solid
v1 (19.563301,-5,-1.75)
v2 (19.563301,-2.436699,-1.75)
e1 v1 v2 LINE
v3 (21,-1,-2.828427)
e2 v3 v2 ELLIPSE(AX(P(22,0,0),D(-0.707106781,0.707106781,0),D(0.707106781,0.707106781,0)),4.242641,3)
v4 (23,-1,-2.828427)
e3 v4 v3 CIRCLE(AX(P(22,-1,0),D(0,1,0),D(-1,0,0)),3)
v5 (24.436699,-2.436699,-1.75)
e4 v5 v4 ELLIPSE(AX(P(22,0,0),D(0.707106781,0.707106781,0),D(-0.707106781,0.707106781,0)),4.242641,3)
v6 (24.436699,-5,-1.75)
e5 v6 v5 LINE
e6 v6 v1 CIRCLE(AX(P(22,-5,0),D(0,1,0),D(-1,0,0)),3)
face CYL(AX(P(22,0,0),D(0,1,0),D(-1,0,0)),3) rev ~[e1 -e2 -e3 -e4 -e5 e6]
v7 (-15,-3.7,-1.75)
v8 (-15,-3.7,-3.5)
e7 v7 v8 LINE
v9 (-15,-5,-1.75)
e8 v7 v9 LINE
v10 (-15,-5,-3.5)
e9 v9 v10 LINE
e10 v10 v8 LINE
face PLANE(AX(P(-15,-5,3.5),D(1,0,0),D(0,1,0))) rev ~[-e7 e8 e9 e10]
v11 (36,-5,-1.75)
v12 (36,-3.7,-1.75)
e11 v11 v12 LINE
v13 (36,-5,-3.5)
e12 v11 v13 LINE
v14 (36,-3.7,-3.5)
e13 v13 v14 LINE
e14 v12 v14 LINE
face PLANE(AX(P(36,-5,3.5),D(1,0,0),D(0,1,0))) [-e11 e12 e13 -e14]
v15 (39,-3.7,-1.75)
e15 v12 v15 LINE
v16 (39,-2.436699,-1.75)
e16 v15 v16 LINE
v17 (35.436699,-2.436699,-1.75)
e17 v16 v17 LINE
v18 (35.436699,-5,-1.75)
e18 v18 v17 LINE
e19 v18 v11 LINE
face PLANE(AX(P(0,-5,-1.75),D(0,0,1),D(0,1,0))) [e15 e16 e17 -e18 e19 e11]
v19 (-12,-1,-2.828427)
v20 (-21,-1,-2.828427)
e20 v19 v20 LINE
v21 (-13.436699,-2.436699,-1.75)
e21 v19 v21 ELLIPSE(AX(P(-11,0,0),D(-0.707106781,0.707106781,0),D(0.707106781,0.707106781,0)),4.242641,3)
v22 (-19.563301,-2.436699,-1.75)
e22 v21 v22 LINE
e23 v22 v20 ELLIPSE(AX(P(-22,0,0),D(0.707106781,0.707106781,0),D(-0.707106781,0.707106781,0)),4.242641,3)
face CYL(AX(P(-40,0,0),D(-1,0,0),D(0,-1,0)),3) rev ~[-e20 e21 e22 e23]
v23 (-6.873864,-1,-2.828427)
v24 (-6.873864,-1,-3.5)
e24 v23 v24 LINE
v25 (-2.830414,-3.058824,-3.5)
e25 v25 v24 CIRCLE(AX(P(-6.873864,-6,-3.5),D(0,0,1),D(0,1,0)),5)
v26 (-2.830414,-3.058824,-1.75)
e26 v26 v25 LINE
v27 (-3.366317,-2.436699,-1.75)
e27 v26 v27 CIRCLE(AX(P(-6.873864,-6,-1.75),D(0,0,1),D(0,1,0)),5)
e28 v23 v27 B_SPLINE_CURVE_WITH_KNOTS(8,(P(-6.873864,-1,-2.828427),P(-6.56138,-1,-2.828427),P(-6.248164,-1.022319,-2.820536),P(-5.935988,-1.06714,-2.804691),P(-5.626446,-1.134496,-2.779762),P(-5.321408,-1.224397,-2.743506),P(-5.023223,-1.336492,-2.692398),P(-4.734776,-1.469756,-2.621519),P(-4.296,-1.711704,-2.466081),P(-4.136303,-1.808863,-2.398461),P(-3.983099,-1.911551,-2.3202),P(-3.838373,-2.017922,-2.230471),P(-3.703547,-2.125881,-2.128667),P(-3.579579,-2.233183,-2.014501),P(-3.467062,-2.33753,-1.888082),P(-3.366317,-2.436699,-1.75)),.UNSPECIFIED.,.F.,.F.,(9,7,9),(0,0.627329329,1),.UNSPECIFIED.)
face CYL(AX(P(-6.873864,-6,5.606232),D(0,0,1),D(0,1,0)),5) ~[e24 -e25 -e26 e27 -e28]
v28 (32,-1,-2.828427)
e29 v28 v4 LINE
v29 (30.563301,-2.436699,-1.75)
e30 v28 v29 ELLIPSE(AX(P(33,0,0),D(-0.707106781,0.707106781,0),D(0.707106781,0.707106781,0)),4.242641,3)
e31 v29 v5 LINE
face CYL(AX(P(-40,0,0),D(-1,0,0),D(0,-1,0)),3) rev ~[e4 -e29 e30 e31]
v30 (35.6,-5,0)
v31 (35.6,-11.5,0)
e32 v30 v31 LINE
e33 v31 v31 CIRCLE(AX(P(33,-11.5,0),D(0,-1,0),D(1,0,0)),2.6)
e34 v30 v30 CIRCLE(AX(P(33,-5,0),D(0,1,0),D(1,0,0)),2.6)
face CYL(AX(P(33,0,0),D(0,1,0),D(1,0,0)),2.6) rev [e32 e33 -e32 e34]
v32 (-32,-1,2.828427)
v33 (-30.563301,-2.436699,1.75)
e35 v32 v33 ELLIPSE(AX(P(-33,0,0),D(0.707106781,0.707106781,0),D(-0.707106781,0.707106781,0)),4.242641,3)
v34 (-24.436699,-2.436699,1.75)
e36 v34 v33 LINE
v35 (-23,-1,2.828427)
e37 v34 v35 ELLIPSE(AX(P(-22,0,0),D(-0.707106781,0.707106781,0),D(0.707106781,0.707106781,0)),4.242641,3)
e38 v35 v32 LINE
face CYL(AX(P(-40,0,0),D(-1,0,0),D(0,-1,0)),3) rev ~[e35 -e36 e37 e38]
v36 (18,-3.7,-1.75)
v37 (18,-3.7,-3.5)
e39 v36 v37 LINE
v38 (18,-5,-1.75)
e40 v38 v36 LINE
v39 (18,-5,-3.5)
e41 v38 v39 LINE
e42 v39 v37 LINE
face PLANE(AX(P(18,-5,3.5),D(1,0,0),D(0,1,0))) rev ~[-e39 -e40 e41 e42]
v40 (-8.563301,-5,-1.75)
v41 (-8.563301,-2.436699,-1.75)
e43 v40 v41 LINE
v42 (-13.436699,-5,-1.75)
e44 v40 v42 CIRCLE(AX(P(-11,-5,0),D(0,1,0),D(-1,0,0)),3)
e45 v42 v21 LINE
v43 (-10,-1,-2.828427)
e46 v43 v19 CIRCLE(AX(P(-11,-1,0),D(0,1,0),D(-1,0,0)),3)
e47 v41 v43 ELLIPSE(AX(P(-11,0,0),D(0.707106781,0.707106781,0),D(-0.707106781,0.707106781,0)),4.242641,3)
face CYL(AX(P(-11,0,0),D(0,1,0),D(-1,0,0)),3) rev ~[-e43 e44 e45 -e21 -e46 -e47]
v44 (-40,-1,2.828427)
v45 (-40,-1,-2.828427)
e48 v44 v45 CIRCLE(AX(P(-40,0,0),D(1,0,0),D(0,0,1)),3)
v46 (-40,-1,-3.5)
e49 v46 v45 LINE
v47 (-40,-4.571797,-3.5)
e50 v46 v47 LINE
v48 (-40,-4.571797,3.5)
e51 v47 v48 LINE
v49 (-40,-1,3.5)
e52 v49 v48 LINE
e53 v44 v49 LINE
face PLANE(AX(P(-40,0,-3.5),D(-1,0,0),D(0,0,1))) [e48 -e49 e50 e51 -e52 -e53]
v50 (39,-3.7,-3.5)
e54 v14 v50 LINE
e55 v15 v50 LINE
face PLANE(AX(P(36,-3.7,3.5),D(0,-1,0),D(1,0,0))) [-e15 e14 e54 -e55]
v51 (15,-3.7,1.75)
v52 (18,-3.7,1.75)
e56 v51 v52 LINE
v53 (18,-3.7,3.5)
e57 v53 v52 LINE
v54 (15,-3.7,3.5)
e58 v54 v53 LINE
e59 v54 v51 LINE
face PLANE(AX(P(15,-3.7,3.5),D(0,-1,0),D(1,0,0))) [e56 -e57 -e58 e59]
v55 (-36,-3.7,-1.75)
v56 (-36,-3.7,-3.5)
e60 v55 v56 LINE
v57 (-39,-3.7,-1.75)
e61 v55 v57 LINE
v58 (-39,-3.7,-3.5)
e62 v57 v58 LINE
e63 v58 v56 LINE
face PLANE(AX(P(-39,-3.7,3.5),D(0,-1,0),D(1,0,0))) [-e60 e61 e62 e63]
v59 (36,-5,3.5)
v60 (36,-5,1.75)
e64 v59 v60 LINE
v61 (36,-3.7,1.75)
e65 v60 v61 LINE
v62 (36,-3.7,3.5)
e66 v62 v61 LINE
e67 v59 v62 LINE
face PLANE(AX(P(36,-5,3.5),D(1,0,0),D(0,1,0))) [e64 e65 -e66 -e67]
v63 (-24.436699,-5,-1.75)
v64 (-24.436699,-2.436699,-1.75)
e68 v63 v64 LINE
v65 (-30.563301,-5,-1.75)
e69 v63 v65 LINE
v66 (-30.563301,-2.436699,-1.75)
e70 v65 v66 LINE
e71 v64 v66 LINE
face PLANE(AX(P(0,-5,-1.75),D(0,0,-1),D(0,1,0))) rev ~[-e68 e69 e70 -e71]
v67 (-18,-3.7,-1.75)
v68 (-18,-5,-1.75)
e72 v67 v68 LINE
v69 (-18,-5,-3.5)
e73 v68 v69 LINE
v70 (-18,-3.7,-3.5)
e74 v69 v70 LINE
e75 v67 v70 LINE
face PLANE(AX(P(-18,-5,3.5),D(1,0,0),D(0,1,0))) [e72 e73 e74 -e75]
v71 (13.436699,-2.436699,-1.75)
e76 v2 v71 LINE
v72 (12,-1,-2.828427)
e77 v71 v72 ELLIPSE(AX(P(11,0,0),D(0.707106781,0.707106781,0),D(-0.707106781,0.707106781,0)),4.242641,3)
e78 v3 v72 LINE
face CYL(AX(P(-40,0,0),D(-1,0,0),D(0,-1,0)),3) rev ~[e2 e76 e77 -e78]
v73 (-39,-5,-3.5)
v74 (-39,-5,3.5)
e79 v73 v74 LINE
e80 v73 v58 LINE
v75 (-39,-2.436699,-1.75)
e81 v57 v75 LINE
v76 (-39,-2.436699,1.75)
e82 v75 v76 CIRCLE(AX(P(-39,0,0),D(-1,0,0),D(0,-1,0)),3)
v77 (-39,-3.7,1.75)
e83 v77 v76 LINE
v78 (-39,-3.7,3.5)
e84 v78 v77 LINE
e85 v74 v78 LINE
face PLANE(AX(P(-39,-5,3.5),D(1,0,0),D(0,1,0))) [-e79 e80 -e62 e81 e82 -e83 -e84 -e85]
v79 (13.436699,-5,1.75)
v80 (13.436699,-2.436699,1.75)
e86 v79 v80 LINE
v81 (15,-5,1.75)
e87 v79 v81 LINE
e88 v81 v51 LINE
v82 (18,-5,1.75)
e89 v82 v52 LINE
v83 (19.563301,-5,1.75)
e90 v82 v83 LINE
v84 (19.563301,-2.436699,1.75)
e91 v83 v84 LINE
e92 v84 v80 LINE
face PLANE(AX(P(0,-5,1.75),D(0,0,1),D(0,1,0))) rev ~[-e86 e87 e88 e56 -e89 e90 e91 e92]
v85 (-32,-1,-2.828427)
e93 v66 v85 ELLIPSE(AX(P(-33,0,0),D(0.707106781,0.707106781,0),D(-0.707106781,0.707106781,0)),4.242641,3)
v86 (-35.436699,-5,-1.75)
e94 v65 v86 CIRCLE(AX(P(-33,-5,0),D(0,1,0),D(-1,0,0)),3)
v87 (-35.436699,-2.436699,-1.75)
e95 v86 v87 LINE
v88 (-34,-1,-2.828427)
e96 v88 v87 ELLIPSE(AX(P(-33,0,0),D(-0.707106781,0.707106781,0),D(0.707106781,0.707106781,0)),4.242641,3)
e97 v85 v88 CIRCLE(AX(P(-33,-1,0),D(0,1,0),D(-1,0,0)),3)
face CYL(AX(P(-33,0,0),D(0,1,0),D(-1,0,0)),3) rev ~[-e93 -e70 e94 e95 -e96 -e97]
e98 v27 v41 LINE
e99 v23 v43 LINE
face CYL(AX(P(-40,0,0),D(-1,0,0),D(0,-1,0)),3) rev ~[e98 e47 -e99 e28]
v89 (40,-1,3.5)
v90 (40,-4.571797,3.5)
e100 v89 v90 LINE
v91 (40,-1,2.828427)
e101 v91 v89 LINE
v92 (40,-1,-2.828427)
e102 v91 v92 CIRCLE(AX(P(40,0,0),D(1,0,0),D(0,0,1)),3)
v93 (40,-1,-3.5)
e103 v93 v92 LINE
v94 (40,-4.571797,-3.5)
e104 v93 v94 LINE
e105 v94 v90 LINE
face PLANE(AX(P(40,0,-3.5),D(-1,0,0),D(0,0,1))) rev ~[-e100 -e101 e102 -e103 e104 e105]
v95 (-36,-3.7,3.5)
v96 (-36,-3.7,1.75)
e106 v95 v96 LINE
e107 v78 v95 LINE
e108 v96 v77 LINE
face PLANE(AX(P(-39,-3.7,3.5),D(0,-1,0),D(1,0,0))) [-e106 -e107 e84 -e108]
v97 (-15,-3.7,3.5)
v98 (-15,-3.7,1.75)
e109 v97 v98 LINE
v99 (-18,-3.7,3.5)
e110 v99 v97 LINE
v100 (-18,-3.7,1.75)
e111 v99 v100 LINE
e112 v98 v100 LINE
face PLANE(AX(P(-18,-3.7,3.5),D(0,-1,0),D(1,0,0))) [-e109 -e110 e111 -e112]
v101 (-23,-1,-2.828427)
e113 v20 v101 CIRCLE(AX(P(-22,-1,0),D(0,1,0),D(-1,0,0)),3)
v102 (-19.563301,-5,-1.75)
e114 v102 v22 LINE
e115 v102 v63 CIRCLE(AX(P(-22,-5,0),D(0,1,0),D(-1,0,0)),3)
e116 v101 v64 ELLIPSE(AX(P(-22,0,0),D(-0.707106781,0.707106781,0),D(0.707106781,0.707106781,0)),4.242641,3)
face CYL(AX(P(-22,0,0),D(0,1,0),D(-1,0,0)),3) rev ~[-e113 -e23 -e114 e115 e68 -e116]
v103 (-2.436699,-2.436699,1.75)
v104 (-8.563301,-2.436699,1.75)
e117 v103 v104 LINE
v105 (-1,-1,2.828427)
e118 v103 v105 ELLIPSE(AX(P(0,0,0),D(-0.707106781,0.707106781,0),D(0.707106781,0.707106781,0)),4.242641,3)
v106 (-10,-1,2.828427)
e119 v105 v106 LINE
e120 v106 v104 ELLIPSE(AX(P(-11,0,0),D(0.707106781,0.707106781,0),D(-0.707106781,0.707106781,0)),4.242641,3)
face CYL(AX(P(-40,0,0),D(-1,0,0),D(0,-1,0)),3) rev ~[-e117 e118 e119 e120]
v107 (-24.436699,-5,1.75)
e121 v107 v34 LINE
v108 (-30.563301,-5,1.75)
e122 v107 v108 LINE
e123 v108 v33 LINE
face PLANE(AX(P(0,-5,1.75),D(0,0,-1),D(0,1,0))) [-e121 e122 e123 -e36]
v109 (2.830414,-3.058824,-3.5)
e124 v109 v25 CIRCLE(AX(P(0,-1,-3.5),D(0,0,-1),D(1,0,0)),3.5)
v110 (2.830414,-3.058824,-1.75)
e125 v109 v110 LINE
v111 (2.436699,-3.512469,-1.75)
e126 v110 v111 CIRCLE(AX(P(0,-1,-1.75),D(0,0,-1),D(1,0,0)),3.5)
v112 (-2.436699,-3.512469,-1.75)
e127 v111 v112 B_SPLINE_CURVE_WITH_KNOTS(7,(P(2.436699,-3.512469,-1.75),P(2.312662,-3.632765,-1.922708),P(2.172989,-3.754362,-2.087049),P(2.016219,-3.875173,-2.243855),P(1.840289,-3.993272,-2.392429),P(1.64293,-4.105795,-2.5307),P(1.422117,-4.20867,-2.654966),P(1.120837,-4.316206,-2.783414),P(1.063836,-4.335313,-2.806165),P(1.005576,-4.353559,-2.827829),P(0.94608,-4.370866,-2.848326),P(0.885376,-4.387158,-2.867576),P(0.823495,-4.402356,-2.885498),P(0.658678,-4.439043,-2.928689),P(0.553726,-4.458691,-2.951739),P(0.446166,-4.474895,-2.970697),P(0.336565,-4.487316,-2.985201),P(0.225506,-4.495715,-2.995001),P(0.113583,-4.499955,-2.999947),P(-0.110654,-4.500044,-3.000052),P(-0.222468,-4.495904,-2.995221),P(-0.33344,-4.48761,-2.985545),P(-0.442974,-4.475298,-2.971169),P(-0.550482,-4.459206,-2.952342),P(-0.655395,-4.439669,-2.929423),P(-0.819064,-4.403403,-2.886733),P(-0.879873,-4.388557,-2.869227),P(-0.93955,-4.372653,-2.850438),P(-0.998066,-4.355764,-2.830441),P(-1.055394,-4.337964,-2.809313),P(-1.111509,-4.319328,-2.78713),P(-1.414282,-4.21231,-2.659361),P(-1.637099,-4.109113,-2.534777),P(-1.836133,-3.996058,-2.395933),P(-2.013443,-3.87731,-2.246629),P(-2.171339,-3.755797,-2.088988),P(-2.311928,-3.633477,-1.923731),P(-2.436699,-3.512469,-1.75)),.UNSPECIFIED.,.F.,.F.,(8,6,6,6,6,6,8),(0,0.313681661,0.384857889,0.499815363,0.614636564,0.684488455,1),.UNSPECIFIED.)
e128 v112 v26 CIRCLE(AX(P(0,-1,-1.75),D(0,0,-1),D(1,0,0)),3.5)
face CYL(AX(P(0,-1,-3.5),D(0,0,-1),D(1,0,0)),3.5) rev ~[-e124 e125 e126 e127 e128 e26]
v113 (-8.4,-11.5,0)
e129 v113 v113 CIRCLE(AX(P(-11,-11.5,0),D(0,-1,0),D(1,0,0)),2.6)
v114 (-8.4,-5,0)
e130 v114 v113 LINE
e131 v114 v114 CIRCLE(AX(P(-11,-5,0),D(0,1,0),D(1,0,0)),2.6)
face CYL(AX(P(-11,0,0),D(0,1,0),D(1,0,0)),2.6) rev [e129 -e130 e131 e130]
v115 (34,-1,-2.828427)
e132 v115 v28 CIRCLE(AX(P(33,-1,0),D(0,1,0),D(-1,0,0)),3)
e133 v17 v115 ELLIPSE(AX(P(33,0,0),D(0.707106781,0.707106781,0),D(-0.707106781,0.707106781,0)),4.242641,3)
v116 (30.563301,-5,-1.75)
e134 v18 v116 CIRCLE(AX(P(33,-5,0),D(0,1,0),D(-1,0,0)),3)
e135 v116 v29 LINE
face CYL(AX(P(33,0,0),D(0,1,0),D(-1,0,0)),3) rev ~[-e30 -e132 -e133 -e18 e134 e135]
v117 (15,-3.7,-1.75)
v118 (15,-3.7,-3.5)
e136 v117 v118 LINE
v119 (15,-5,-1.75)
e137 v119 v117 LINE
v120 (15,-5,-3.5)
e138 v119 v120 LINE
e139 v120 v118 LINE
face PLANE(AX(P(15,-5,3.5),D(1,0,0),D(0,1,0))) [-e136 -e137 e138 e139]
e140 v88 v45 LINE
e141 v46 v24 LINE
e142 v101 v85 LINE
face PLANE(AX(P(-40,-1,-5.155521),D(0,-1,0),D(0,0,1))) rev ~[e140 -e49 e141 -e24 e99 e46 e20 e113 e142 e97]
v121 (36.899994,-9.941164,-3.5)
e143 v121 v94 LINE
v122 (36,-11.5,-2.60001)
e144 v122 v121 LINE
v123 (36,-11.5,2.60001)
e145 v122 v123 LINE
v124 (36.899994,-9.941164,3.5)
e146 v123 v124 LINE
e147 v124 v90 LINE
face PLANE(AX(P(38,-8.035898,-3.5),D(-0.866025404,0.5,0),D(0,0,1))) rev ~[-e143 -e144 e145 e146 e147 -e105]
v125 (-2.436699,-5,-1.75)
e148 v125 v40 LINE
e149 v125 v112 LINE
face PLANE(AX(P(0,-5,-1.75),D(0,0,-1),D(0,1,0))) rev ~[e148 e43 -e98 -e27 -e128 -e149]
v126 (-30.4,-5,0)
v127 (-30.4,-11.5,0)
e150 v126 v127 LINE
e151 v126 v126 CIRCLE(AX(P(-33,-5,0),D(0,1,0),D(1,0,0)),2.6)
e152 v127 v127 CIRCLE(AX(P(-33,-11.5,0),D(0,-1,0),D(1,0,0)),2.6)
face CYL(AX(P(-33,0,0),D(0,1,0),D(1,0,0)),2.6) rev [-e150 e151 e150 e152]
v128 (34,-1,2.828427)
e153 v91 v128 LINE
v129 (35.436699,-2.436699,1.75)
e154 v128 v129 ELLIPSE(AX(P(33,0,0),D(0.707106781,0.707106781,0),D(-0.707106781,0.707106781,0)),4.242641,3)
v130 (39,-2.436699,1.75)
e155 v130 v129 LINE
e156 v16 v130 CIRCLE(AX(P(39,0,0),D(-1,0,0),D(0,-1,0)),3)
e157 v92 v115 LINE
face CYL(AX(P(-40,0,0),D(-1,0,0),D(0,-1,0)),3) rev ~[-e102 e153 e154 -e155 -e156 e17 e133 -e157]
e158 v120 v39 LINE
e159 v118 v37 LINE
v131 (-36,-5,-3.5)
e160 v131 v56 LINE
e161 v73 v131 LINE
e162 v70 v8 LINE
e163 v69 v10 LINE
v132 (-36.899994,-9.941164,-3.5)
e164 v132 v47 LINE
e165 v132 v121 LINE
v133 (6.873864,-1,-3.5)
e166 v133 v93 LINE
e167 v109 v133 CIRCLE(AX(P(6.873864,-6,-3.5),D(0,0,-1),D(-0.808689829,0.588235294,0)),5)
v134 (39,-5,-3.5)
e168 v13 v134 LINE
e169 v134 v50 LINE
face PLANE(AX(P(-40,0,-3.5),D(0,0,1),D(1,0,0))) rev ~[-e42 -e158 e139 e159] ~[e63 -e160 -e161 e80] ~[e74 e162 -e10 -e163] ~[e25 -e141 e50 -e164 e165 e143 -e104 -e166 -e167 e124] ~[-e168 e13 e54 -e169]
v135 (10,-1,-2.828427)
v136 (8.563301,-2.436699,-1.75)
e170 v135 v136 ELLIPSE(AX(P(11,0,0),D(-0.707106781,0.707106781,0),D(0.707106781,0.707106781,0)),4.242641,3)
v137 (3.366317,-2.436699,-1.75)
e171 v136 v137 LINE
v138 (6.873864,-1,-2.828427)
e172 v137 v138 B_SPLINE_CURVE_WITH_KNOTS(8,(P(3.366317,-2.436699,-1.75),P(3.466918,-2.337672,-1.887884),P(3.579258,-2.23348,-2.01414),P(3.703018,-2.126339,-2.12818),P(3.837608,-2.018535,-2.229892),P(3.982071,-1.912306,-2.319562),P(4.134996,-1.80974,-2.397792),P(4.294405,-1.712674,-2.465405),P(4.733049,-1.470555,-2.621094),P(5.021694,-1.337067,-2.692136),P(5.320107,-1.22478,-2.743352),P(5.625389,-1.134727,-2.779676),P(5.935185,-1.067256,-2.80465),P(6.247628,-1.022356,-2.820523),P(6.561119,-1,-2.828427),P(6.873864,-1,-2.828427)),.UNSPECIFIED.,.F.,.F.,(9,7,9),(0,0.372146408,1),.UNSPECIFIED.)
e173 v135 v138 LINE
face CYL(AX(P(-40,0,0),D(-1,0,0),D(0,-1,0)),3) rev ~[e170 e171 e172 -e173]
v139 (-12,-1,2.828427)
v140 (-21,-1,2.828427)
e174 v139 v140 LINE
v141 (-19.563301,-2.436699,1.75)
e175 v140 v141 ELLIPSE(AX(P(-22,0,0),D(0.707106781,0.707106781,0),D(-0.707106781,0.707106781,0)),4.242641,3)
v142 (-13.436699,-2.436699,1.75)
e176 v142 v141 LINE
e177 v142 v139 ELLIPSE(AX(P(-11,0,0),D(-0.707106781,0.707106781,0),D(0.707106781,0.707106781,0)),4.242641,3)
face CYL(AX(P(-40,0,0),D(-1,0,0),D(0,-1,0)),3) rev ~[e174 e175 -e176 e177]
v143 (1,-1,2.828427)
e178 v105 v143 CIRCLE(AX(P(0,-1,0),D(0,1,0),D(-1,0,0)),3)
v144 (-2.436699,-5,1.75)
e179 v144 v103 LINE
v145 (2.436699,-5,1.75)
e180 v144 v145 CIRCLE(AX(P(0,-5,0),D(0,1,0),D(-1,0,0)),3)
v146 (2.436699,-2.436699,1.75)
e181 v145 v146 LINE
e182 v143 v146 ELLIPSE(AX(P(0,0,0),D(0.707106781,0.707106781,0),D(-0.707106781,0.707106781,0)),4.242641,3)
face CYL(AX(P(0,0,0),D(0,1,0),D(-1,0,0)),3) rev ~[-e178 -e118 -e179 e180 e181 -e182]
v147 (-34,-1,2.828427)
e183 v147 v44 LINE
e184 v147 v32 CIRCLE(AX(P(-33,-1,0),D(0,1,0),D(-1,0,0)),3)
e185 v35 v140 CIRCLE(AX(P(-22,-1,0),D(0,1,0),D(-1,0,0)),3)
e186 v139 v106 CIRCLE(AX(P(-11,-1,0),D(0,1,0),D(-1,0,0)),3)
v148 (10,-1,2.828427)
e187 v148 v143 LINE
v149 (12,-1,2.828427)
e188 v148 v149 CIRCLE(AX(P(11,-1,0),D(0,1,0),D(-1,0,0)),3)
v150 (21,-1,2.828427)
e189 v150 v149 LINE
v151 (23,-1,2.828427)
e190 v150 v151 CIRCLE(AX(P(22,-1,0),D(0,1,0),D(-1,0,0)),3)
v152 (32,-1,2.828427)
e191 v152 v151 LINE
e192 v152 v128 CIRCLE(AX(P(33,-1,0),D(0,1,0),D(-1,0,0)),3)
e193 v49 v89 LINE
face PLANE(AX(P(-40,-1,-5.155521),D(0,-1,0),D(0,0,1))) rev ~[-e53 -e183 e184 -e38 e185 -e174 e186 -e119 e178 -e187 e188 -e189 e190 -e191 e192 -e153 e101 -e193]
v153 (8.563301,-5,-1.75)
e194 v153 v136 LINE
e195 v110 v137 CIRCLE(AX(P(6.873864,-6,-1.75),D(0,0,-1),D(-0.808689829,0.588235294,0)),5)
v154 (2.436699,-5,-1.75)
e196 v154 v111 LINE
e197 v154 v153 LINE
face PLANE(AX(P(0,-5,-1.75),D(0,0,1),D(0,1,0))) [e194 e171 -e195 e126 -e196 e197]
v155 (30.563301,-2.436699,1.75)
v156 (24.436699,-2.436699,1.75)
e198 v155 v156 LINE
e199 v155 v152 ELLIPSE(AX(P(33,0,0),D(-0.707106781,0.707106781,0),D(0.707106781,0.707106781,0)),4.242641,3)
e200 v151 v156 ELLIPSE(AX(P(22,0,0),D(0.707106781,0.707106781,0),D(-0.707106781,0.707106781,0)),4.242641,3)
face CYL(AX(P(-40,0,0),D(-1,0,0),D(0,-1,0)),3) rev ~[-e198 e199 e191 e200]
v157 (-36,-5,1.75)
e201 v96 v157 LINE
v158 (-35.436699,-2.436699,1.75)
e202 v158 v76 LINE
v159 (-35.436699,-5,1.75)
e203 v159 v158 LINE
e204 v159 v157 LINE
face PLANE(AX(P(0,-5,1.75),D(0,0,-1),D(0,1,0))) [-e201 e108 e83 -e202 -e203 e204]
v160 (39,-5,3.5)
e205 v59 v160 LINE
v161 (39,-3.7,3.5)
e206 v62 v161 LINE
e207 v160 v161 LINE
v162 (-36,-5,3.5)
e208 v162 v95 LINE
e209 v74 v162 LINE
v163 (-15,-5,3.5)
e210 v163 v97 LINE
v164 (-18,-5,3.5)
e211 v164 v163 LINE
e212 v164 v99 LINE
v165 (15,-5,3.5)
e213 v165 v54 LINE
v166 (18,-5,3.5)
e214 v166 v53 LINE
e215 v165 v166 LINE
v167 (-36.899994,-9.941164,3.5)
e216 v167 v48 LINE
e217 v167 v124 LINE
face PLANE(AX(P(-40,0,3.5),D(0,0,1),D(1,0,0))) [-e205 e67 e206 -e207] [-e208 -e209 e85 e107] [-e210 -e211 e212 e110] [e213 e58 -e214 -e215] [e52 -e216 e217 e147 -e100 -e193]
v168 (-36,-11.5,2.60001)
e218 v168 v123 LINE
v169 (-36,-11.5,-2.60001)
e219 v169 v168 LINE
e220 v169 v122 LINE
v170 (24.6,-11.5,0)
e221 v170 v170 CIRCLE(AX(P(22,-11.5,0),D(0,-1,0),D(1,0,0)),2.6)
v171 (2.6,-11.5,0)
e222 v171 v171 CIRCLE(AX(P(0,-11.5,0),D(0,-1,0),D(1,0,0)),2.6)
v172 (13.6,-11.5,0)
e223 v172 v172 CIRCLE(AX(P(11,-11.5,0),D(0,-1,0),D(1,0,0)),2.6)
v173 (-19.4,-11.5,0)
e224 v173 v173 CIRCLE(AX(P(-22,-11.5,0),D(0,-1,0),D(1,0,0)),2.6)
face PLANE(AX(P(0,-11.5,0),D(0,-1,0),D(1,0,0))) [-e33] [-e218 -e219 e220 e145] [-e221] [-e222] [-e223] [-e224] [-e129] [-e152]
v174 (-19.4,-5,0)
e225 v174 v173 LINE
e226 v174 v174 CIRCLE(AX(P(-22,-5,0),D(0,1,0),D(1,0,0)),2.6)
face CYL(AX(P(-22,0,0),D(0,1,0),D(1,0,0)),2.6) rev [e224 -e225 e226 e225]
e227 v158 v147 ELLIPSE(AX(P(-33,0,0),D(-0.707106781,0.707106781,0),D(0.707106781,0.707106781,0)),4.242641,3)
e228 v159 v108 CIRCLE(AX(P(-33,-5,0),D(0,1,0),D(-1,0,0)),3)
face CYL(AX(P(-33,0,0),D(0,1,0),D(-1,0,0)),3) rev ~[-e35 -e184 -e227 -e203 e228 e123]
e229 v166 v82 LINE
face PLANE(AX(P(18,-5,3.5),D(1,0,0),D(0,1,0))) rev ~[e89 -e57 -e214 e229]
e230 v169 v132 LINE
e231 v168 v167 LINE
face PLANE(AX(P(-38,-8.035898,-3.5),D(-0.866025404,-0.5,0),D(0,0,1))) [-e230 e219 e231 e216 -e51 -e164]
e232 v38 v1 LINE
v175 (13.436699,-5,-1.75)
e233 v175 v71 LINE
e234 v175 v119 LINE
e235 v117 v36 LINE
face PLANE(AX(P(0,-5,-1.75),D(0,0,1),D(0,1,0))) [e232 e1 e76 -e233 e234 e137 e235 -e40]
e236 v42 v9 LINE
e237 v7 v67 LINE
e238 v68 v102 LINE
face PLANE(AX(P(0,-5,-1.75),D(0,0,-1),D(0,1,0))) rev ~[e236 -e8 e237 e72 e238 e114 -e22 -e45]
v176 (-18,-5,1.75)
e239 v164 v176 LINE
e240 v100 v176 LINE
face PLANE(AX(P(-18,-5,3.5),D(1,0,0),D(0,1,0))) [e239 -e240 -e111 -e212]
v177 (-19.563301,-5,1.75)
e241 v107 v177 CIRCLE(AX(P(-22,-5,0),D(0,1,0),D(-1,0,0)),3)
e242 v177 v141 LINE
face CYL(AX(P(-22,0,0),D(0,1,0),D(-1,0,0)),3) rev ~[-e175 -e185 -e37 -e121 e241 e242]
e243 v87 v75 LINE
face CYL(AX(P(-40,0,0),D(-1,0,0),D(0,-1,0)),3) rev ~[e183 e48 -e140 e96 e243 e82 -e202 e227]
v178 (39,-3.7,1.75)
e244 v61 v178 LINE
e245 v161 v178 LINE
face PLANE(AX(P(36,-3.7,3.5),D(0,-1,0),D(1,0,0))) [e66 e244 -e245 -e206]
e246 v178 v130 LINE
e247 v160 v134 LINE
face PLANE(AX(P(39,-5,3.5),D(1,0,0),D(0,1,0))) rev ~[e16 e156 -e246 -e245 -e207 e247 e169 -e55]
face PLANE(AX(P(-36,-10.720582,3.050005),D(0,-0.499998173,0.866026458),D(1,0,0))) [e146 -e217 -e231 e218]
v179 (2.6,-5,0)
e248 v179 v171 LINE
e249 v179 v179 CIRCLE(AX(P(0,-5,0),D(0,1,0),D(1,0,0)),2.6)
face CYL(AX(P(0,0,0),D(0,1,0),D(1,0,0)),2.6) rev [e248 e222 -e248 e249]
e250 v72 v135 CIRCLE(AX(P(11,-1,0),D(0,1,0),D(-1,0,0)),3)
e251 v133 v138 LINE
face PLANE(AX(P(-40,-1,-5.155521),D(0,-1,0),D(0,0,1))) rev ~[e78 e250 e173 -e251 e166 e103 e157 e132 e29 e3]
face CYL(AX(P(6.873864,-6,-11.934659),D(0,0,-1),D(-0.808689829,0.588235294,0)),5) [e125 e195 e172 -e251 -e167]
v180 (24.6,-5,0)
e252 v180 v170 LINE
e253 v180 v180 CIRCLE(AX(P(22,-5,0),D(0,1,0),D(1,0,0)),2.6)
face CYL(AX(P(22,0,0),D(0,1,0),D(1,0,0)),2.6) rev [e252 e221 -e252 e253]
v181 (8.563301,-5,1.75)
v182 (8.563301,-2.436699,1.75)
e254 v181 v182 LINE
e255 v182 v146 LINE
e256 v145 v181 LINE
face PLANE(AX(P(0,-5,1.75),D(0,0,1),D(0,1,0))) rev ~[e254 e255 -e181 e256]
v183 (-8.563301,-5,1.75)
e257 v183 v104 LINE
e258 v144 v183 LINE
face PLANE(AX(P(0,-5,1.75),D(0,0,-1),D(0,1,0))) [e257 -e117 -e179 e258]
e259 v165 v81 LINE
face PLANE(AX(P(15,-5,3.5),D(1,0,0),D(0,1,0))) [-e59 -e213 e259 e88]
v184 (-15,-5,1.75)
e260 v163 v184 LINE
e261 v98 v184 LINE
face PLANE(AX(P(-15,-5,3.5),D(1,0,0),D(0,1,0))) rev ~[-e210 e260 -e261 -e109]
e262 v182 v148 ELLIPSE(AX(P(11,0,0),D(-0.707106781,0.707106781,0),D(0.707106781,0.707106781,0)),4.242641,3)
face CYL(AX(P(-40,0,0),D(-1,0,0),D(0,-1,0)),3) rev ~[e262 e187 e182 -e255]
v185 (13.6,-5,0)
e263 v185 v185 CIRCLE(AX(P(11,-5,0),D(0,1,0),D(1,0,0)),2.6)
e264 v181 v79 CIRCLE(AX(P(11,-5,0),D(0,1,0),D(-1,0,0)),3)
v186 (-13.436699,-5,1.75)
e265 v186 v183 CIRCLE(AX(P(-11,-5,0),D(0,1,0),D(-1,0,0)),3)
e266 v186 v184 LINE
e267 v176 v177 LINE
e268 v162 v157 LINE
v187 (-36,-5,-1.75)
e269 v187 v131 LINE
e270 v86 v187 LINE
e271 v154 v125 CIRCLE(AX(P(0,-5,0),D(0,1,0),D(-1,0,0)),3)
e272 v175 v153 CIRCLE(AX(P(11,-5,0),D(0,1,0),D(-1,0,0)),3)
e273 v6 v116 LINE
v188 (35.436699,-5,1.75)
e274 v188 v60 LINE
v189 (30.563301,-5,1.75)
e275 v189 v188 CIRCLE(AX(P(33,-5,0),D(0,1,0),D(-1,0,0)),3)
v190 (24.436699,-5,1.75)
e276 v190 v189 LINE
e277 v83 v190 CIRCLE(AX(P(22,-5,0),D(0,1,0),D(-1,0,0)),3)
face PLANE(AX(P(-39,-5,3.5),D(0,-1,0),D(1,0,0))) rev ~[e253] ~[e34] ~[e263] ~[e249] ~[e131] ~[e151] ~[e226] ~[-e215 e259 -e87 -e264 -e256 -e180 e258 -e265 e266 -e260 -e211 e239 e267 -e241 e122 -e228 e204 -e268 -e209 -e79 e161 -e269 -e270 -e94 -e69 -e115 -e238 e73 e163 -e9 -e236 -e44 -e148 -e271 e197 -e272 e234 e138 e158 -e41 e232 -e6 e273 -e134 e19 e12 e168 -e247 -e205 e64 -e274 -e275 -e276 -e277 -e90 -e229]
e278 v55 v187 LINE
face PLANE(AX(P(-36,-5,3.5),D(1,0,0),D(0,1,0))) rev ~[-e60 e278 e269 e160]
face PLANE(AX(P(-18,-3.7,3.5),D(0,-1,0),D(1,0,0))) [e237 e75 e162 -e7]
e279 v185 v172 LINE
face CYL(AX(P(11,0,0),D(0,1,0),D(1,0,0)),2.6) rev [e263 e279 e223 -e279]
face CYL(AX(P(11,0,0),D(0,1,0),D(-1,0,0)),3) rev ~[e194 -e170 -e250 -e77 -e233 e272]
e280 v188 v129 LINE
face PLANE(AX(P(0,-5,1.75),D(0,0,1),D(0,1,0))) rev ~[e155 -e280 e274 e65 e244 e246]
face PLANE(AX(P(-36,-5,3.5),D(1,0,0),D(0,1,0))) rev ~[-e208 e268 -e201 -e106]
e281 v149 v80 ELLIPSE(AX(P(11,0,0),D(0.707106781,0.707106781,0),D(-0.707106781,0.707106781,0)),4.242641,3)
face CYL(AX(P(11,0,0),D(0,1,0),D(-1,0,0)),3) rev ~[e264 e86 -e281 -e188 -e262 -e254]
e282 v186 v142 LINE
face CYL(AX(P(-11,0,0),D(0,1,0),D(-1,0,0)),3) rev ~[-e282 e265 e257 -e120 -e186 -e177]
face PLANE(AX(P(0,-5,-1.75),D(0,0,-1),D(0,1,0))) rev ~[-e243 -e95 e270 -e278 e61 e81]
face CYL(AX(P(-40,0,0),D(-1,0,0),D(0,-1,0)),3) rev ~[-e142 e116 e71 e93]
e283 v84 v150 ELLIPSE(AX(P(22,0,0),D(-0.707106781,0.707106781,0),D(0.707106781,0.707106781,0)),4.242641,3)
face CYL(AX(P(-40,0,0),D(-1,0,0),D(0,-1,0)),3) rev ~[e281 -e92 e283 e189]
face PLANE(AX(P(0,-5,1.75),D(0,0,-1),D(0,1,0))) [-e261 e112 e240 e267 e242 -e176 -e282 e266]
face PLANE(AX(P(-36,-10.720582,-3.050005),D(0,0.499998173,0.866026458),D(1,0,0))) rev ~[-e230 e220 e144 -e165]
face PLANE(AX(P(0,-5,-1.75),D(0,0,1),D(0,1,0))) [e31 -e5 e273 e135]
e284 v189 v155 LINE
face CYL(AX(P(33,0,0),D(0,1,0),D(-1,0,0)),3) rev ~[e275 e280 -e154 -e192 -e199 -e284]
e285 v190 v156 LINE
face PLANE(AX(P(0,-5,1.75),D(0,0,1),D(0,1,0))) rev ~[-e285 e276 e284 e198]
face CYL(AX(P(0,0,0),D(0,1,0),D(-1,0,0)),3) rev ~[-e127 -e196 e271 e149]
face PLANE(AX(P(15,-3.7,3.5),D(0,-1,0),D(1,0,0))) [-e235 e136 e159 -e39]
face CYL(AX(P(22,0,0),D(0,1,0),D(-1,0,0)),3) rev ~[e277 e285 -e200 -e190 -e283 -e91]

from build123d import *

# Parameters (mm, degrees)
F0_W          = 80
F0_H          = 7
F0_R          = 2.6
F1_DEPTH      = 11.5
F2_R          = 3
F3_DEPTH      = 5
F4_R          = 3
F5_DEPTH      = 80.001
F6_W          = 4
F6_H          = 3.5
F7_DEPTH      = 39
F7_DEPTH_BACK = 39
F8_SIZE2      = 6.9282032303
F8_SIZE       = 4
F9_SIZE2      = 1.558836
F9_SIZE       = 0.89999
F10_W         = 2
F10_H         = 10.311042398
F11_DEPTH     = 80.001
F12_R         = 3.5
F13_DEPTH     = 1.75
F14_T4_DEPTH  = 17.5408905874
F14_T9_DEPTH  = 17.5408905874
F15_W         = 3
F15_H         = 1.3
F16_DEPTH     = 7.0010001


# Not quite as in the source:
# - a fillet or chamfer that OpenCascade refuses, or shapes differently, is made with other operations: its cross-section is extruded or revolved along the edge and cut away or added
# - a fillet or chamfer is up to 0.001 mm smaller than in the source, because OpenCascade refuses the exact size


with BuildPart() as f1:
    # F0 (on Front) → F1 (new body)
    with BuildSketch(Plane.XZ):
        Rectangle(F0_W, F0_H)
        with Locations((-33, 0)):
            Circle(F0_R, mode=Mode.SUBTRACT)
        with Locations((-22, 0)):
            Circle(F0_R, mode=Mode.SUBTRACT)
        with Locations((-11, 0)):
            Circle(F0_R, mode=Mode.SUBTRACT)
        Circle(F0_R, mode=Mode.SUBTRACT)
        with Locations((11, 0)):
            Circle(F0_R, mode=Mode.SUBTRACT)
        with Locations((22, 0)):
            Circle(F0_R, mode=Mode.SUBTRACT)
        with Locations((33, 0)):
            Circle(F0_R, mode=Mode.SUBTRACT)
    extrude(amount=F1_DEPTH)

    # F2 (on face) → F3 (cut)
    with BuildSketch(Plane(origin=(0, 0, 0), x_dir=(-1, 0, 0), z_dir=(0, 1, 0))):
        Circle(F2_R)
        with Locations((11, 0)):
            Circle(F2_R)
        with Locations((22, 0)):
            Circle(F2_R)
        with Locations((33, 0)):
            Circle(F2_R)
        with Locations((-11, 0)):
            Circle(F2_R)
        with Locations((-22, 0)):
            Circle(F2_R)
        with Locations((-33, 0)):
            Circle(F2_R)
    extrude(amount=-F3_DEPTH, mode=Mode.SUBTRACT)

    # F4 (on face) → F5 (cut, through all)
    with BuildSketch(Plane(origin=(-40, 0, 0), x_dir=(0, -1, 0), z_dir=(-1, 0, 0))):
        Circle(F4_R)
    extrude(amount=-F5_DEPTH, mode=Mode.SUBTRACT)

    # F6 (on Right) → F7 (cut, two sides)
    with BuildSketch(Plane.YZ) as f7_sk:
        with Locations((-3, 0)):
            Rectangle(F6_W, F6_H)
    extrude(amount=-F7_DEPTH, mode=Mode.SUBTRACT)
    extrude(f7_sk.sketch, amount=F7_DEPTH_BACK, mode=Mode.SUBTRACT)

    # F8
    f8_edges = [f1.edges().sort_by_distance(p)[0] for p in [
        (-40, -11.5, 0),
        (40, -11.5, 0),
    ]]
    f8_side = f1.faces().sort_by_distance((39.196943, -11.5, 0))[0]
    chamfer(f8_edges, length=F8_SIZE, length2=F8_SIZE2, reference=f8_side)

    # F9 (size 0.9 and 1.5588457268 in the source; OpenCascade refuses exactly that, so slightly less here)
    f9_edges = [f1.edges().sort_by_distance(p)[0] for p in [
        (0, -11.5, 3.5),
        (0, -11.5, -3.5),
    ]]
    f9_side = f1.faces().sort_by_distance((0, -11.5, 2.776605))[0]
    chamfer(f9_edges, length=F9_SIZE, length2=F9_SIZE2, reference=f9_side)

    # F10 (on face) → F11 (cut, through all)
    with BuildSketch(Plane(origin=(-40, 0, 0), x_dir=(0, -1, 0), z_dir=(-1, 0, 0))):
        Rectangle(F10_W, F10_H)
    extrude(amount=-F11_DEPTH, mode=Mode.SUBTRACT)

    # F12 (on face) → F13 (cut, through all)
    with BuildSketch(Plane(origin=(0, 0, -3.5), x_dir=(1, 0, 0), z_dir=(0, 0, -1))):
        with Locations((0, 1)):
            Circle(F12_R)
    extrude(amount=-F13_DEPTH, mode=Mode.SUBTRACT)

    # F14: fillet of radius 5 on 2 edges, made by hand


with BuildPart() as f14_tool2:
    # F14_s3 → F14_t4 (new body)
    with BuildSketch(Plane.XY.offset(5.6062317314)):
        with BuildLine():
            ThreePointArc((-6.8738635424, -1), (-4.60515051, -1.5443360566), (-2.8304143998, -3.0588235294))
            ThreePointArc((-2.8304143998, -3.0588235294), (-3.3283967912, -2.0824854735), (-3.5, -1))
            Line((-3.5, -1), (-6.8738635424, -1))
        make_face()
    extrude(amount=-F14_T4_DEPTH)

    split(bisect_by=Plane.XY.offset(1.75), keep=Keep.BOTTOM)


with BuildPart() as f1_1:
    add(f1.part)

    # F14_t1: cut F14_tool2
    add(f14_tool2.part, mode=Mode.SUBTRACT)


with BuildPart() as f14_tool7:
    # F14_s8 → F14_t9 (new body)
    with BuildSketch(Plane.XY.offset(-11.9346588561)):
        with BuildLine():
            ThreePointArc((2.8304143998, -3.0588235294), (4.60515051, -1.5443360566), (6.8738635424, -1))
            Line((6.8738635424, -1), (3.5, -1))
            ThreePointArc((3.5, -1), (3.3283967912, -2.0824854735), (2.8304143998, -3.0588235294))
        make_face()
    extrude(amount=F14_T9_DEPTH)

    split(bisect_by=Plane.XY.offset(1.75), keep=Keep.BOTTOM)


with BuildPart() as f1_2:
    add(f1_1.part)

    # F14_t6: cut F14_tool7
    add(f14_tool7.part, mode=Mode.SUBTRACT)

    # F15 (on face) → F16 (cut, through all)
    with BuildSketch(Plane.XY.offset(3.5)):
        with Locations((37.5, -4.35)):
            Rectangle(F15_W, F15_H)
        with Locations((16.5, -4.35)):
            Rectangle(F15_W, F15_H)
        with Locations((-16.5, -4.35)):
            Rectangle(F15_W, F15_H)
        with Locations((-37.5, -4.35)):
            Rectangle(F15_W, F15_H)
    extrude(amount=-F16_DEPTH, mode=Mode.SUBTRACT)


solid = f1_2.part
